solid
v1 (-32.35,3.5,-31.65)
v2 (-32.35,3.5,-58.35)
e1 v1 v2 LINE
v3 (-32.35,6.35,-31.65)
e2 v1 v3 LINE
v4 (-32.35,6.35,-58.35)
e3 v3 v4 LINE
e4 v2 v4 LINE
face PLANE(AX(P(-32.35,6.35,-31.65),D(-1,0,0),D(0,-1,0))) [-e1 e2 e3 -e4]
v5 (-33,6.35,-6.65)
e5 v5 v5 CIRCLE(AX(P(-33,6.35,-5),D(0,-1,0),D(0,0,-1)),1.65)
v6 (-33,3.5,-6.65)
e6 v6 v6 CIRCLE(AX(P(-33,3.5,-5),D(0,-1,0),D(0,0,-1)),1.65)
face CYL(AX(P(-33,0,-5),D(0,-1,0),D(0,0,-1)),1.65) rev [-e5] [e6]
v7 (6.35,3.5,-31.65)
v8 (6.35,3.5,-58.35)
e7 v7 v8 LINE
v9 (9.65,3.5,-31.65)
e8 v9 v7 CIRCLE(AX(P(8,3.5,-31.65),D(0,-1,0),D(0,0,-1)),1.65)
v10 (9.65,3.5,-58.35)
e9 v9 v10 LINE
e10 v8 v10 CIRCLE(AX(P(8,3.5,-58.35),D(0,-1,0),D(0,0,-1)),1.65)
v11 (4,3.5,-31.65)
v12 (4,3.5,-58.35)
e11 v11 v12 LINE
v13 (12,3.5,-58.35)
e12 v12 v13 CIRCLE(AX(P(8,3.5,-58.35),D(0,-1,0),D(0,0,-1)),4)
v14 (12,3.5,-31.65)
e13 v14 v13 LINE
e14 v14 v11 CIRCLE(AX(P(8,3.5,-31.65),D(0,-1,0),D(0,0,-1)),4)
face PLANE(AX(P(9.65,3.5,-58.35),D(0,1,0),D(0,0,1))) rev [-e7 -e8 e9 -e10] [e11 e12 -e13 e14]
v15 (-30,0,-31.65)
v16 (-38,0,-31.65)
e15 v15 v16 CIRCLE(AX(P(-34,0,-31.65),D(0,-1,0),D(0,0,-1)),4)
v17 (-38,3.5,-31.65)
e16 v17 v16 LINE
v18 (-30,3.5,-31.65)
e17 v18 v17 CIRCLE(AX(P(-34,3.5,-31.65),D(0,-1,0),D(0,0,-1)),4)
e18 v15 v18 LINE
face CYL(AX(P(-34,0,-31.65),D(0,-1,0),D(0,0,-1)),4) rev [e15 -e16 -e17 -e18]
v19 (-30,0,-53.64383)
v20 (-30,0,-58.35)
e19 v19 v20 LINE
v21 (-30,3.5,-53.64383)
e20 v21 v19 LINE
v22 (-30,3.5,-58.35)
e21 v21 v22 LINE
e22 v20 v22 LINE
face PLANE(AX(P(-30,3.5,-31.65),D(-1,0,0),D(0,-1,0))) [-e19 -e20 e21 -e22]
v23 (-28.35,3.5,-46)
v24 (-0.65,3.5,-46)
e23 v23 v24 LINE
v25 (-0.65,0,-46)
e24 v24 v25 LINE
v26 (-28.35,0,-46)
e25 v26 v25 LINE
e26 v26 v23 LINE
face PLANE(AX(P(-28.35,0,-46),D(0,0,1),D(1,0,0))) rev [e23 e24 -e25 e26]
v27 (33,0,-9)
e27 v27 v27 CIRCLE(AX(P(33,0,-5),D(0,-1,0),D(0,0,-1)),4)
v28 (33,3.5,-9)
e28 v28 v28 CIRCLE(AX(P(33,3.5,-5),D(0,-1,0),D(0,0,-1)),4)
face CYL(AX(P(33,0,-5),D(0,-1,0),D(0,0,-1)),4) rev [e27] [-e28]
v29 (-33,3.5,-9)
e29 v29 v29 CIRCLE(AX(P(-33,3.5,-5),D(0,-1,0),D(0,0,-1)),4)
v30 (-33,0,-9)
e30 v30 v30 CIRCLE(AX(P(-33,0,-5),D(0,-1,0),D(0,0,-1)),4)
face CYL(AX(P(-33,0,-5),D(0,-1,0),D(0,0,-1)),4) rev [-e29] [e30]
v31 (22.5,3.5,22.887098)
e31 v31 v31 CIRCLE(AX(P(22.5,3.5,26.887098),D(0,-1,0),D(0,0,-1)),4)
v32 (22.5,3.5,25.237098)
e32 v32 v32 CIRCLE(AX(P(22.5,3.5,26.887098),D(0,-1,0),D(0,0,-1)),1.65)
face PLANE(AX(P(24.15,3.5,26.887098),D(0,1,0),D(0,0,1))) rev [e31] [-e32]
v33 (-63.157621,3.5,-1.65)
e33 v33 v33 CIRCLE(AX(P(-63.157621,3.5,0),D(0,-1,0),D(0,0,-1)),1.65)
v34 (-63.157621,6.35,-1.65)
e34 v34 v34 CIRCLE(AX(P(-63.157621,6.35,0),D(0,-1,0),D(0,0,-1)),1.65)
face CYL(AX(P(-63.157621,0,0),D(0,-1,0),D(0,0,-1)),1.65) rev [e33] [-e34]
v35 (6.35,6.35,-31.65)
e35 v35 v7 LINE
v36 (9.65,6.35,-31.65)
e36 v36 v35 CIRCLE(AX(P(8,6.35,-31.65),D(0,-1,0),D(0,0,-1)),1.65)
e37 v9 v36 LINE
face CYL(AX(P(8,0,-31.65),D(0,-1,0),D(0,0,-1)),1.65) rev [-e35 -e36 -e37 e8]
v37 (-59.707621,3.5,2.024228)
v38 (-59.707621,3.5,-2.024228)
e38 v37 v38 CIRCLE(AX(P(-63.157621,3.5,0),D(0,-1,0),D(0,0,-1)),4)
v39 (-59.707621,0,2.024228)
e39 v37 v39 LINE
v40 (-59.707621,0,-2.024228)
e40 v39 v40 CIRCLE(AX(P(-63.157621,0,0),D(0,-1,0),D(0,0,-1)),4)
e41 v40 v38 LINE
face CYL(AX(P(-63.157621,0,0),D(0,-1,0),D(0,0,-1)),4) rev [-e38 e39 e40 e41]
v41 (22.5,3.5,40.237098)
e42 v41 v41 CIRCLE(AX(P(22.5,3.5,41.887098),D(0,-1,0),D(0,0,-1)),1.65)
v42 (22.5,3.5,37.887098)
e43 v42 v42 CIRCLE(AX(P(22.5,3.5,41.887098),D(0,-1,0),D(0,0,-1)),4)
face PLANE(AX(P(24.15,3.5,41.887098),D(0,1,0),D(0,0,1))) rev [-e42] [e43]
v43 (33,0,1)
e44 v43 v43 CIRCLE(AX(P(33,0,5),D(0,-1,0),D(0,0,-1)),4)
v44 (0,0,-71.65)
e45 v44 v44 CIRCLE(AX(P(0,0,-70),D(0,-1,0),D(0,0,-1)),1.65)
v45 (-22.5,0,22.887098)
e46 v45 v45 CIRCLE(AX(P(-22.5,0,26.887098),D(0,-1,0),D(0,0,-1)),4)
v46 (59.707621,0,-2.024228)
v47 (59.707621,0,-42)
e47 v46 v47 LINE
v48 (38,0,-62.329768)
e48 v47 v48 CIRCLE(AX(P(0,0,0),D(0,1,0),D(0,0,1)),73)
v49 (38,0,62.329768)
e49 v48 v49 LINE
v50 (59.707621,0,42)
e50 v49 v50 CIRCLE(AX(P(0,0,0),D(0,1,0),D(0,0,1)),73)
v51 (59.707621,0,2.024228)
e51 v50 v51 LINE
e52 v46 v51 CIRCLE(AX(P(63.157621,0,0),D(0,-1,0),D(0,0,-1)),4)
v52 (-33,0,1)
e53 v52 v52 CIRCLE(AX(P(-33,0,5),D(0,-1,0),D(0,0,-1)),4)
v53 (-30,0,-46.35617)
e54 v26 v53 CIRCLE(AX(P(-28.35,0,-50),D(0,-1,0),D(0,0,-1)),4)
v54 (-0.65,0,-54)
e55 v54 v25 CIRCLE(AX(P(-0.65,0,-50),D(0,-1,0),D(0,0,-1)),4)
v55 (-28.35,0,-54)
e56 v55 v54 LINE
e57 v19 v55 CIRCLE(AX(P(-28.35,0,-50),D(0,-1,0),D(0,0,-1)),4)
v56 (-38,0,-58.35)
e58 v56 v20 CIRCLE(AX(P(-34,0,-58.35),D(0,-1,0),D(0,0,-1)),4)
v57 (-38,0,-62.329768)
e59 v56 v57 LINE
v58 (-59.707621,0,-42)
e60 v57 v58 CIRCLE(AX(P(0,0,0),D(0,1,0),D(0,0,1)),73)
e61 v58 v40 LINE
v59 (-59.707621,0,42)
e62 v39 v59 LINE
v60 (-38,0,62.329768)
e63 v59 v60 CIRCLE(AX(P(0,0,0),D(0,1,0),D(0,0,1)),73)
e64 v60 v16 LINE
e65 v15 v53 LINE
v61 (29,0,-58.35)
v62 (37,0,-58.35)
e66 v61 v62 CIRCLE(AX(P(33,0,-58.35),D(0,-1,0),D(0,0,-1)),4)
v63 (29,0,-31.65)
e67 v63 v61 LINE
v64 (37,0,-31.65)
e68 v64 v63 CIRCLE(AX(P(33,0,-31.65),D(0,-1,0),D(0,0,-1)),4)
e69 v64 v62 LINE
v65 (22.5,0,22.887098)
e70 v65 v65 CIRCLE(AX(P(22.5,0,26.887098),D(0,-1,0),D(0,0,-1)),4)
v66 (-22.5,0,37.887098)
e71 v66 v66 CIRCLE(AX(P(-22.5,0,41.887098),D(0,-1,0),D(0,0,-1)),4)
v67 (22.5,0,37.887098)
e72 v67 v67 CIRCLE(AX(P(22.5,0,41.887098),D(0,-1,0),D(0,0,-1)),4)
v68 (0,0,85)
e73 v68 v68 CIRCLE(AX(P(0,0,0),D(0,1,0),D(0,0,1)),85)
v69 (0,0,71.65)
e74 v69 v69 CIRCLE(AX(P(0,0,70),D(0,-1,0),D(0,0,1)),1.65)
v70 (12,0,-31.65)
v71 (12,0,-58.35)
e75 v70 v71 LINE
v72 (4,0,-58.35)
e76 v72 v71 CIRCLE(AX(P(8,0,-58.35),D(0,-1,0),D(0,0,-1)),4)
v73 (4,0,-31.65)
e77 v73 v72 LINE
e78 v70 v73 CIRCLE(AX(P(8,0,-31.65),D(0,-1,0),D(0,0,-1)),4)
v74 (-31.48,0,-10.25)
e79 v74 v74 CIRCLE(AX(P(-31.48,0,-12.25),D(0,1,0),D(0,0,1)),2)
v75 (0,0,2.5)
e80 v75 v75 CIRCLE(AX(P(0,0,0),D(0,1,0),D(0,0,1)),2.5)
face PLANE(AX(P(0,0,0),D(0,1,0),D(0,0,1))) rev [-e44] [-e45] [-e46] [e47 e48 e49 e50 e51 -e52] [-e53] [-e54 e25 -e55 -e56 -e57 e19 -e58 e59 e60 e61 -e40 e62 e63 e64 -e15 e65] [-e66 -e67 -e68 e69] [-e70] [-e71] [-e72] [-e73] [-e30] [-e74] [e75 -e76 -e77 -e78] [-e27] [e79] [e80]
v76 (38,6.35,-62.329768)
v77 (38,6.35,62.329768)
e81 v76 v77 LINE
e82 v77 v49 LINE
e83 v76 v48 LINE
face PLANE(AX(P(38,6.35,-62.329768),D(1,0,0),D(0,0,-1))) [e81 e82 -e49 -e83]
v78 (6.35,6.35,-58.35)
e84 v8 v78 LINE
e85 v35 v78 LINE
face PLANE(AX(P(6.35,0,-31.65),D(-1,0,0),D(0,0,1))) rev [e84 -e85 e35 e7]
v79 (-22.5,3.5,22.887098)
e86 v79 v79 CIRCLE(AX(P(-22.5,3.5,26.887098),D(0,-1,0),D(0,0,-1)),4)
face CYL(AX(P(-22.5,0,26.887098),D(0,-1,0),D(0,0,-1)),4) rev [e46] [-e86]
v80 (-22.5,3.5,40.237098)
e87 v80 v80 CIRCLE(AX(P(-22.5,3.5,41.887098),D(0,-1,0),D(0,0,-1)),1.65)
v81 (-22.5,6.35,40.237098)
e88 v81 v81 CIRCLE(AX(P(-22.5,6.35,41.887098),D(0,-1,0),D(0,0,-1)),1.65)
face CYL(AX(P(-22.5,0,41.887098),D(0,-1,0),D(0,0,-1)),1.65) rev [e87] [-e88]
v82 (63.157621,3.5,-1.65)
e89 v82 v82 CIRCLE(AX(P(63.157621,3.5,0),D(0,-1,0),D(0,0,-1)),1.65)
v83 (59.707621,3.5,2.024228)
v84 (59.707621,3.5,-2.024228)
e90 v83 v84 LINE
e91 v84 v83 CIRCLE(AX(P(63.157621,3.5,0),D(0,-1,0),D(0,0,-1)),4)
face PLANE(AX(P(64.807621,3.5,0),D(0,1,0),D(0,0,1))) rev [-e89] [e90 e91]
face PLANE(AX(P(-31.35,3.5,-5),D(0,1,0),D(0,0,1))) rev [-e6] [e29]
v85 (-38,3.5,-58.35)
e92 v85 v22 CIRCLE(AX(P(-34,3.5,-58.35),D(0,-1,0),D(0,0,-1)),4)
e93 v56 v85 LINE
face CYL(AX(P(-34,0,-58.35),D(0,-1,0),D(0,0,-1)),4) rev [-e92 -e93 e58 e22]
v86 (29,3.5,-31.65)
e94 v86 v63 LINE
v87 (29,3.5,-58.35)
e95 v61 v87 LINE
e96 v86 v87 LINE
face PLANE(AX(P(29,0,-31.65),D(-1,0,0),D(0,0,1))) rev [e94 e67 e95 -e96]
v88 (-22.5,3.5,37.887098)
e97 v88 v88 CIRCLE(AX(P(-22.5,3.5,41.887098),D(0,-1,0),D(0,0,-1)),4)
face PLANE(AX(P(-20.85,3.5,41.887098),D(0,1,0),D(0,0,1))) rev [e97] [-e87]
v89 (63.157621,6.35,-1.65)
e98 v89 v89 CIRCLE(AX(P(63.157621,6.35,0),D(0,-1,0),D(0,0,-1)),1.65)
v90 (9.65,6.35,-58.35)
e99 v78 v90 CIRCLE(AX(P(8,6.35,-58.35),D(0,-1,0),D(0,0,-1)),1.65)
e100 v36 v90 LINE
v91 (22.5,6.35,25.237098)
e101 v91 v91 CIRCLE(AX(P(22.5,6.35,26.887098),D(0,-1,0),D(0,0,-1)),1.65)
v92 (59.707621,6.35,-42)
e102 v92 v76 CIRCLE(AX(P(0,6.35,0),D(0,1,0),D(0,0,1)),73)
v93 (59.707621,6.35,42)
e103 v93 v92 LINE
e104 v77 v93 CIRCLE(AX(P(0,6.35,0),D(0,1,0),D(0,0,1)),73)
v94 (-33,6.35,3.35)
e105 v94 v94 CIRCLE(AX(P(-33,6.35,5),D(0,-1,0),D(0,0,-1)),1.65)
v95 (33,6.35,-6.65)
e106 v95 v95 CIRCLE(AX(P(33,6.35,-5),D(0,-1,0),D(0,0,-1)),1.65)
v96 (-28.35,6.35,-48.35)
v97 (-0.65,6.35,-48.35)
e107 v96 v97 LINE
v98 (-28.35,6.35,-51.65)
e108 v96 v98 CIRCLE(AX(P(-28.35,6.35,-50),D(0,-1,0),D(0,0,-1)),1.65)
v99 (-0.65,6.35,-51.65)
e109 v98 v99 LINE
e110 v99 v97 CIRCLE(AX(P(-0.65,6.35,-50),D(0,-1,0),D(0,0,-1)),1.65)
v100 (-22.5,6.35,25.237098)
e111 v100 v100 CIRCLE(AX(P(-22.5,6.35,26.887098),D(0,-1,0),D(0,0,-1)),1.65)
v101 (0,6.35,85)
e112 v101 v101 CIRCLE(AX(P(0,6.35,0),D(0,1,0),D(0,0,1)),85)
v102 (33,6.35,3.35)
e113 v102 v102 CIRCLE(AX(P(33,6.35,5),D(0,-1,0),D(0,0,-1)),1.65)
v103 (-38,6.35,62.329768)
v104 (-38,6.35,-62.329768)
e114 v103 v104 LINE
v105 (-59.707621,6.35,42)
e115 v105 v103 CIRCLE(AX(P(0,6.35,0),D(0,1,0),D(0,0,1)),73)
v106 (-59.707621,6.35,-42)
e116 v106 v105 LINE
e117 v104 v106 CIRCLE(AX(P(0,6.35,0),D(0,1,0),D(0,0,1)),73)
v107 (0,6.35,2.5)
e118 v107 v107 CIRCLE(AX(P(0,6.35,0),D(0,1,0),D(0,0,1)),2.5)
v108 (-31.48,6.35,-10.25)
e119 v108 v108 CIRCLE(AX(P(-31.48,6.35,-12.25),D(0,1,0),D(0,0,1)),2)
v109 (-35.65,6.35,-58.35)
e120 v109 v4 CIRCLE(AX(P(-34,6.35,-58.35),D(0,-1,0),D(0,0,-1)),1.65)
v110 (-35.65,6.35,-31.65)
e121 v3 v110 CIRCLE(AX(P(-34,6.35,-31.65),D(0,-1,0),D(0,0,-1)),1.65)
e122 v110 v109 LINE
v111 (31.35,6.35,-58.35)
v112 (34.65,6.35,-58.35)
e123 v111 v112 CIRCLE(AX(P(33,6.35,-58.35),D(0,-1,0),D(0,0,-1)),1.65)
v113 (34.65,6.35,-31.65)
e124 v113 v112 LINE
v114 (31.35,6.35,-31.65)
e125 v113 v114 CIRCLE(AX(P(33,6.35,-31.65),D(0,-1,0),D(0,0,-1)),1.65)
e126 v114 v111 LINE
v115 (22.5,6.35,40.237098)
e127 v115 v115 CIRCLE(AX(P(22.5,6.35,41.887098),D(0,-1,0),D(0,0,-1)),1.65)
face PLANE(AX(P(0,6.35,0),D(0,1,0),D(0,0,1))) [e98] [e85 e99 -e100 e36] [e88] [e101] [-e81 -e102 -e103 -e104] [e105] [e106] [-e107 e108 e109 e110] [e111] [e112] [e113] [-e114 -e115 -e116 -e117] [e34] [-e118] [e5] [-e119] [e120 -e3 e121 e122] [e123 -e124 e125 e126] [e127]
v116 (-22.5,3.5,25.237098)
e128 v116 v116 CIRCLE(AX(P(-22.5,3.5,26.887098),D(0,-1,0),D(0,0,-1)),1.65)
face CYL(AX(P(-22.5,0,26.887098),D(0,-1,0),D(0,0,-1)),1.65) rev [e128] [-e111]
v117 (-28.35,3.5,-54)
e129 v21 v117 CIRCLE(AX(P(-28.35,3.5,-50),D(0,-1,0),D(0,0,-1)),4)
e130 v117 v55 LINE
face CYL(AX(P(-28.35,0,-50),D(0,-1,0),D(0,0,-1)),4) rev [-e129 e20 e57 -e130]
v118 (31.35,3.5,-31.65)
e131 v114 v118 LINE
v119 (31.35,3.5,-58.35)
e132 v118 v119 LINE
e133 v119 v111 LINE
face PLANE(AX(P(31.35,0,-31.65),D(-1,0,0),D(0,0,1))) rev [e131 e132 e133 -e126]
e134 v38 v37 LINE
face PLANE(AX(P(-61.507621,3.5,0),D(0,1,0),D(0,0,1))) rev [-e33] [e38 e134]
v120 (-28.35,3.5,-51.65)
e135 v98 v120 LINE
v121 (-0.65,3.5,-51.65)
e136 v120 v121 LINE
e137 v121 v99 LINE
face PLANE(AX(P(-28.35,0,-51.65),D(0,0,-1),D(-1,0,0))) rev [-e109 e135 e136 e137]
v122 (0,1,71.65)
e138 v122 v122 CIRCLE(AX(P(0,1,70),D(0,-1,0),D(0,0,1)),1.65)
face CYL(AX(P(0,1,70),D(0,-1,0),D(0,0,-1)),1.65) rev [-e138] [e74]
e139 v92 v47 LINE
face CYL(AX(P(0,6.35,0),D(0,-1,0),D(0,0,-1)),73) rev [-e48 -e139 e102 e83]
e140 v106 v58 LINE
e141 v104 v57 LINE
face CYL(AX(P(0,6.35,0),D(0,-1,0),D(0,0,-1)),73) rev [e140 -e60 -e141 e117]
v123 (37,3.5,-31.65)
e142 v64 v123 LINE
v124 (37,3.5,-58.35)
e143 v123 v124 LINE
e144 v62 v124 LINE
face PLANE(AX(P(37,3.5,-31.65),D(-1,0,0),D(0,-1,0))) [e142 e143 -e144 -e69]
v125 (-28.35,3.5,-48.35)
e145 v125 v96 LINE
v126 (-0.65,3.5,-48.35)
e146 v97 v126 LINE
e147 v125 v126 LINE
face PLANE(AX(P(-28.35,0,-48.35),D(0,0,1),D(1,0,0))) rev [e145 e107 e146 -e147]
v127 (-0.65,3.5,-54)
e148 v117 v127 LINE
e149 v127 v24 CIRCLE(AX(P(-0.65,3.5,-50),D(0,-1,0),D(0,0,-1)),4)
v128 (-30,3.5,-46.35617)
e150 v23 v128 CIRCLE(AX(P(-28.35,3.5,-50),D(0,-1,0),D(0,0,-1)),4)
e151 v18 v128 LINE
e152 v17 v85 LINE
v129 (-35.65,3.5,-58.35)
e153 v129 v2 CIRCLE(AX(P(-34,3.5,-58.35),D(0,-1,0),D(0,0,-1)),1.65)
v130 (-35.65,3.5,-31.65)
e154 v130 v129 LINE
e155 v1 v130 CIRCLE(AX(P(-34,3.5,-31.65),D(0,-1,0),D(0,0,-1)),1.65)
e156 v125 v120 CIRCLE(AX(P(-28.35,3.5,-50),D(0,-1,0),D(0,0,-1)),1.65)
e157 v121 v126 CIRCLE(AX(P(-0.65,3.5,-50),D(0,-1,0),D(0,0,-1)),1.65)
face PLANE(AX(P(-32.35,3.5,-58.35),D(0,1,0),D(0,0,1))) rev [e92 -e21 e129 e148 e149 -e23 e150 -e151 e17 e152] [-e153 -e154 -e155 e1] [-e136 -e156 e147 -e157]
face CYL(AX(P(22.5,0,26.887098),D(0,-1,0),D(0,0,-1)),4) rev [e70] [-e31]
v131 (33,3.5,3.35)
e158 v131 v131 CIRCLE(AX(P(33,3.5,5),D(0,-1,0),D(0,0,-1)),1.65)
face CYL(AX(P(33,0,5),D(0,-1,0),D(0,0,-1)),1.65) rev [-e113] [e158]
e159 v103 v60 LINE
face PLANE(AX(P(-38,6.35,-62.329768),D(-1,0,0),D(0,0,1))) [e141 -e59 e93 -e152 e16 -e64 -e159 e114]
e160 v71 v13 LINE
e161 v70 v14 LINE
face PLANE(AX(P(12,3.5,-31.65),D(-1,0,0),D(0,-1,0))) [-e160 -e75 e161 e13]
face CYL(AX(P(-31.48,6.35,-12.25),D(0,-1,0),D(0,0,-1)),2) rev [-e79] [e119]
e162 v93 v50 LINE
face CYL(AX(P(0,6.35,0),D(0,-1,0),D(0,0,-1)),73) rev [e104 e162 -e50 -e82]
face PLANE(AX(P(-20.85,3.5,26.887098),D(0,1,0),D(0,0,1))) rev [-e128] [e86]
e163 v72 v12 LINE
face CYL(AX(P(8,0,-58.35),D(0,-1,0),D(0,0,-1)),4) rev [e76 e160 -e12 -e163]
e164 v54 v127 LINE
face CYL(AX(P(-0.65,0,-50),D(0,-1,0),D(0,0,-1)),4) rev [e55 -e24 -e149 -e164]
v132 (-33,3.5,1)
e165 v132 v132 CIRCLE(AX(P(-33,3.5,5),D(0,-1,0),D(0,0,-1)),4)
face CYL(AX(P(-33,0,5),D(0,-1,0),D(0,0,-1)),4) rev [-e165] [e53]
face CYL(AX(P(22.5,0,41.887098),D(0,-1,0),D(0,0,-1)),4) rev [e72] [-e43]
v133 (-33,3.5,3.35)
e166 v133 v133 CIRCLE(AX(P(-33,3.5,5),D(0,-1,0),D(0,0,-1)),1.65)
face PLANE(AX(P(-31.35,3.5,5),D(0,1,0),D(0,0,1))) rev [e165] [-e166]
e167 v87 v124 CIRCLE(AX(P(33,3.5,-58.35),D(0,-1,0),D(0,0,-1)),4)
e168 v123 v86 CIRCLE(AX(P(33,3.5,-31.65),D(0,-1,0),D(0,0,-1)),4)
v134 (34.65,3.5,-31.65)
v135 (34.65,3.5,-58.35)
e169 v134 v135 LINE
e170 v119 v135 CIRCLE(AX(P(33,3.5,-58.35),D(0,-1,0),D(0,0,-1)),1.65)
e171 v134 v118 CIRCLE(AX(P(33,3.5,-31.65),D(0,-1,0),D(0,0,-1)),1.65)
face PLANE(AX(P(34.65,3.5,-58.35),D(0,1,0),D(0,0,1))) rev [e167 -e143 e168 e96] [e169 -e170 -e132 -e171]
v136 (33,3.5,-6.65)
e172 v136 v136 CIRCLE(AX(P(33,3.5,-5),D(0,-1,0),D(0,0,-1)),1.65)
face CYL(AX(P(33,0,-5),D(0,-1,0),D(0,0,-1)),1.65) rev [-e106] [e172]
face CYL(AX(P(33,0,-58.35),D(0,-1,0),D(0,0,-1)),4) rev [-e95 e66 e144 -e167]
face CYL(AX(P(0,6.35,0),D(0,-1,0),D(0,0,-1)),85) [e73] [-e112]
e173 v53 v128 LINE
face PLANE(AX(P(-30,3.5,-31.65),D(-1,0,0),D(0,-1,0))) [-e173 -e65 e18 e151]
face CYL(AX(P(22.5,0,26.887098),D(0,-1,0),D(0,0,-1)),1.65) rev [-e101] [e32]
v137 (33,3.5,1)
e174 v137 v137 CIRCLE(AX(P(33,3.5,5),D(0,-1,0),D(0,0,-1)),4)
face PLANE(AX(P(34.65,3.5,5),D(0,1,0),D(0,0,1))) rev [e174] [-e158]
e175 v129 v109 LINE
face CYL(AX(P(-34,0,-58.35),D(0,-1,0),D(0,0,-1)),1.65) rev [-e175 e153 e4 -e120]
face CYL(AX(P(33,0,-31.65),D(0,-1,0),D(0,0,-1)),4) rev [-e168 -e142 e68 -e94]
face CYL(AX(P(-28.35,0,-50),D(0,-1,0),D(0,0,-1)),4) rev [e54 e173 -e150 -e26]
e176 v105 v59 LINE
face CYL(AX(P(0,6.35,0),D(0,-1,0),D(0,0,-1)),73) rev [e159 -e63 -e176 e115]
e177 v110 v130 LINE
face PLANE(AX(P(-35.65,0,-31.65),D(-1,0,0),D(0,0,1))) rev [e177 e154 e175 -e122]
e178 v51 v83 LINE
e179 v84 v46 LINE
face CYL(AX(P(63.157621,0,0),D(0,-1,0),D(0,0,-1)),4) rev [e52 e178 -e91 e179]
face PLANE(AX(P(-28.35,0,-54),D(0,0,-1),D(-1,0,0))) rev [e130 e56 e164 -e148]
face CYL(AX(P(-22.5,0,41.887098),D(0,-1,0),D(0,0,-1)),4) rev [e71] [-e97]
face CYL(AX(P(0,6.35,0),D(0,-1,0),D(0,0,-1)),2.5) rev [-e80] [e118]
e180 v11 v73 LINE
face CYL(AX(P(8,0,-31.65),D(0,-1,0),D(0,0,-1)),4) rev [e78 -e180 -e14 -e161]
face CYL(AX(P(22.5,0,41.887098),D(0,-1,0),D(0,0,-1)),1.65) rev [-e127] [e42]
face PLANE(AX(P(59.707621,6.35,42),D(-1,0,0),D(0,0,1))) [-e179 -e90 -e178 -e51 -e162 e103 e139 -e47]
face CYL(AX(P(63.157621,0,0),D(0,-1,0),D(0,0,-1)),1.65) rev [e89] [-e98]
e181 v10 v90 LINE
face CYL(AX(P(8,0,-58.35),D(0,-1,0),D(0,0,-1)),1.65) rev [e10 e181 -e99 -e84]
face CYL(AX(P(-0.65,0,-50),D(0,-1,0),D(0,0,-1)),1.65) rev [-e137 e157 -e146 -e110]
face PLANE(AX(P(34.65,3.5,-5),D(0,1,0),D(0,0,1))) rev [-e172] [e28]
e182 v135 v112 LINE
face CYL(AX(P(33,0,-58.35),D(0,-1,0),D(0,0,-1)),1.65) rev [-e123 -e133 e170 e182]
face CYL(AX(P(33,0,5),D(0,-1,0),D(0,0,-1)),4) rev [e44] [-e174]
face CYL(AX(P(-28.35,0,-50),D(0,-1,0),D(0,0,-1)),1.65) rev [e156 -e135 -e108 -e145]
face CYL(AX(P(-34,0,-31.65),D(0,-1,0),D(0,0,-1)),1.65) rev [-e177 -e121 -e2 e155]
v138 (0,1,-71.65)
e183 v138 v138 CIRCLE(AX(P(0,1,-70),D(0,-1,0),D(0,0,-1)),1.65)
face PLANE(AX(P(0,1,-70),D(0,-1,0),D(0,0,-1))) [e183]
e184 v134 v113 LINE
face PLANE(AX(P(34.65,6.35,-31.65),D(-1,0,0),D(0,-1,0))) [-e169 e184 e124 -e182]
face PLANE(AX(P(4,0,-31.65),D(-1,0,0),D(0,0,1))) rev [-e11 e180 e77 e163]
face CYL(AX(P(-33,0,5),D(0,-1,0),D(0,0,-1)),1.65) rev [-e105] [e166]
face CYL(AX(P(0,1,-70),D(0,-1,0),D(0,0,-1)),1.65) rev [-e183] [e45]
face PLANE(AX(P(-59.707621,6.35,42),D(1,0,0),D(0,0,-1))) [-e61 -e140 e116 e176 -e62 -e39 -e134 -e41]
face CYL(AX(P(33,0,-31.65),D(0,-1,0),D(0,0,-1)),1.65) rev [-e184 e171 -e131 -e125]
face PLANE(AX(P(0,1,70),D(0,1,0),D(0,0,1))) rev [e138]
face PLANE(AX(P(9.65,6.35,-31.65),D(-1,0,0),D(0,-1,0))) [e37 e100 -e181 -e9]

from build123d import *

# Parameters (mm, degrees)
SKETCH1_R                       = 85
SKETCH1_R_2                     = 2.5
SKETCH1_R_3                     = 2
BOSS_EXTRUDE1_DEPTH             = 6.35
CBORE_FOR_M3_SHCS1_D            = 3.3
CBORE_FOR_M3_SHCS1_CBORE_D      = 8
CBORE_FOR_M3_SHCS1_CBORE_DEPTH  = 3.5
CBORE_FOR_M3_SHCS2_D            = 3.3
CBORE_FOR_M3_SHCS2_CBORE_D      = 8
CBORE_FOR_M3_SHCS2_CBORE_DEPTH  = 3.5
CBORE_SLOT_FOR_M3_SHCS1_DEPTH   = 3.5
CBORE_START                     = 3.5
CBORE_SLOT_FOR_M3_SHCS1_2_DEPTH = 2.85
CBORE_SLOT_FOR_M3_SHCS2_DEPTH   = 3.5
CBORE_SLOT_FOR_M3_SHCS2_2_DEPTH = 2.85
SKETCH16_R                      = 1.65
CUT_EXTRUDE1_DEPTH              = 1


# Read off the part's stored shape, not the designer's step: CBORE SLOT for M3 SHCS1, CBORE SLOT for M3 SHCS2
with BuildPart() as part:
    # Sketch1 → Boss-Extrude1 (new body)
    with BuildSketch(Plane(origin=(0, 0, 0), x_dir=(1, 0, 0), z_dir=(0, 1, 0))):
        with Locations(Location((0, 0, 0), (0, 0, 270))):
            Circle(SKETCH1_R)
        with Locations(Location((0, 0, 0), (0, 0, 270))):
            Circle(SKETCH1_R_2, mode=Mode.SUBTRACT)
        with Locations(Location((-31.48, 12.25, 0), (0, 0, 270))):
            Circle(SKETCH1_R_3, mode=Mode.SUBTRACT)
        with BuildLine():
            Line((-38, 62.329768169), (-38, -62.329768169))
            ThreePointArc((-38, -62.329768169), (-49.900096859, -53.282082668), (-59.707620954, -42))
            Line((-59.707620954, -42), (-59.707620954, 42))
            ThreePointArc((-59.707620954, 42), (-49.900096859, 53.282082668), (-38, 62.329768169))
        make_face(mode=Mode.SUBTRACT)
        with BuildLine():
            Line((38, 62.329768169), (38, -62.329768169))
            ThreePointArc((38, -62.329768169), (49.900096859, -53.282082668), (59.707620954, -42))
            Line((59.707620954, -42), (59.707620954, 42))
            ThreePointArc((59.707620954, 42), (49.900096859, 53.282082668), (38, 62.329768169))
        make_face(mode=Mode.SUBTRACT)
    extrude(amount=BOSS_EXTRUDE1_DEPTH)

    # CBORE for M3 SHCS1 (through all)
    with Locations(Plane(origin=(0, 0, 0), x_dir=(-1, 0, 0), z_dir=(0, -1, 0))):
        with Locations((-33, 5), (-33, -5), (33, 5), (33, -5), (63.157620954, 0), (-63.157620954, 0)):
            CounterBoreHole(CBORE_FOR_M3_SHCS1_D / 2, CBORE_FOR_M3_SHCS1_CBORE_D / 2, CBORE_FOR_M3_SHCS1_CBORE_DEPTH)

    # CBORE for M3 SHCS2 (through all)
    with Locations(Plane(origin=(0, 0, 0), x_dir=(-1, 0, 0), z_dir=(0, -1, 0))):
        with Locations((22.5, -26.887097638), (-22.5, -26.887097638), (22.5, -41.887097638), (-22.5, -41.887097638)):
            CounterBoreHole(CBORE_FOR_M3_SHCS2_D / 2, CBORE_FOR_M3_SHCS2_CBORE_D / 2, CBORE_FOR_M3_SHCS2_CBORE_DEPTH)

    # CBORE SLOT for M3 SHCS1 outline → CBORE SLOT for M3 SHCS1 (cut)
    with BuildSketch(Plane(origin=(0, 0, 0), x_dir=(1, 0, 0), z_dir=(0, 1, 0))):
        with BuildLine():
            ThreePointArc((-30, 58.35), (-34, 62.35), (-38, 58.35))
            Line((-38, 58.35), (-38, 31.65))
            ThreePointArc((-38, 31.65), (-34, 27.65), (-30, 31.65))
            Line((-30, 31.65), (-30, 58.35))
        make_face()
        with BuildLine():
            ThreePointArc((12, 58.35), (8, 62.35), (4, 58.35))
            Line((4, 58.35), (4, 31.65))
            ThreePointArc((4, 31.65), (8, 27.65), (12, 31.65))
            Line((12, 31.65), (12, 58.35))
        make_face()
        with BuildLine():
            ThreePointArc((37, 58.35), (33, 62.35), (29, 58.35))
            Line((29, 58.35), (29, 31.65))
            ThreePointArc((29, 31.65), (33, 27.65), (37, 31.65))
            Line((37, 31.65), (37, 58.35))
        make_face()
    extrude(amount=CBORE_SLOT_FOR_M3_SHCS1_DEPTH, mode=Mode.SUBTRACT)

    # CBORE SLOT for M3 SHCS1 2 outline → CBORE SLOT for M3 SHCS1 2 (cut)
    with BuildSketch(Plane(origin=(0, 0, 0), x_dir=(1, 0, 0), z_dir=(0, 1, 0)).offset(CBORE_START)):
        with BuildLine():
            ThreePointArc((-32.35, 58.35), (-34, 60), (-35.65, 58.35))
            Line((-35.65, 58.35), (-35.65, 31.65))
            ThreePointArc((-35.65, 31.65), (-34, 30), (-32.35, 31.65))
            Line((-32.35, 31.65), (-32.35, 58.35))
        make_face()
        with BuildLine():
            ThreePointArc((9.65, 58.35), (8, 60), (6.35, 58.35))
            Line((6.35, 58.35), (6.35, 31.65))
            ThreePointArc((6.35, 31.65), (8, 30), (9.65, 31.65))
            Line((9.65, 31.65), (9.65, 58.35))
        make_face()
        with BuildLine():
            ThreePointArc((34.65, 58.35), (33, 60), (31.35, 58.35))
            Line((31.35, 58.35), (31.35, 31.65))
            ThreePointArc((31.35, 31.65), (33, 30), (34.65, 31.65))
            Line((34.65, 31.65), (34.65, 58.35))
        make_face()
    extrude(amount=CBORE_SLOT_FOR_M3_SHCS1_2_DEPTH, mode=Mode.SUBTRACT)

    # CBORE SLOT for M3 SHCS2 outline → CBORE SLOT for M3 SHCS2 (cut)
    with BuildSketch(Plane(origin=(0, 0, 0), x_dir=(1, 0, 0), z_dir=(0, 1, 0))):
        with BuildLine():
            ThreePointArc((-28.35, 54), (-29.194001893, 53.909943836), (-30, 53.643830402))
            Line((-30, 53.643830402), (-30, 46.356169598))
            ThreePointArc((-30, 46.356169598), (-29.194001893, 46.090056164), (-28.35, 46))
            Line((-28.35, 46), (-0.65, 46))
            ThreePointArc((-0.65, 46), (3.35, 50), (-0.65, 54))
            Line((-0.65, 54), (-28.35, 54))
        make_face()
    extrude(amount=CBORE_SLOT_FOR_M3_SHCS2_DEPTH, mode=Mode.SUBTRACT)

    # CBORE SLOT for M3 SHCS2 2 outline → CBORE SLOT for M3 SHCS2 2 (cut)
    with BuildSketch(Plane(origin=(0, 0, 0), x_dir=(1, 0, 0), z_dir=(0, 1, 0)).offset(CBORE_START)):
        with BuildLine():
            ThreePointArc((-28.35, 51.65), (-30, 50), (-28.35, 48.35))
            Line((-28.35, 48.35), (-0.65, 48.35))
            ThreePointArc((-0.65, 48.35), (1, 50), (-0.65, 51.65))
            Line((-0.65, 51.65), (-28.35, 51.65))
        make_face()
    extrude(amount=CBORE_SLOT_FOR_M3_SHCS2_2_DEPTH, mode=Mode.SUBTRACT)

    # Sketch16 → Cut-Extrude1 (cut)
    with BuildSketch(Plane.XZ):
        with Locations(Location((0, -70, 0), (0, 0, 270))):
            Circle(SKETCH16_R)
        with Locations(Location((0, 70, 0), (0, 0, 90))):
            Circle(SKETCH16_R)
    extrude(amount=-CUT_EXTRUDE1_DEPTH, mode=Mode.SUBTRACT)


solid = part.part
